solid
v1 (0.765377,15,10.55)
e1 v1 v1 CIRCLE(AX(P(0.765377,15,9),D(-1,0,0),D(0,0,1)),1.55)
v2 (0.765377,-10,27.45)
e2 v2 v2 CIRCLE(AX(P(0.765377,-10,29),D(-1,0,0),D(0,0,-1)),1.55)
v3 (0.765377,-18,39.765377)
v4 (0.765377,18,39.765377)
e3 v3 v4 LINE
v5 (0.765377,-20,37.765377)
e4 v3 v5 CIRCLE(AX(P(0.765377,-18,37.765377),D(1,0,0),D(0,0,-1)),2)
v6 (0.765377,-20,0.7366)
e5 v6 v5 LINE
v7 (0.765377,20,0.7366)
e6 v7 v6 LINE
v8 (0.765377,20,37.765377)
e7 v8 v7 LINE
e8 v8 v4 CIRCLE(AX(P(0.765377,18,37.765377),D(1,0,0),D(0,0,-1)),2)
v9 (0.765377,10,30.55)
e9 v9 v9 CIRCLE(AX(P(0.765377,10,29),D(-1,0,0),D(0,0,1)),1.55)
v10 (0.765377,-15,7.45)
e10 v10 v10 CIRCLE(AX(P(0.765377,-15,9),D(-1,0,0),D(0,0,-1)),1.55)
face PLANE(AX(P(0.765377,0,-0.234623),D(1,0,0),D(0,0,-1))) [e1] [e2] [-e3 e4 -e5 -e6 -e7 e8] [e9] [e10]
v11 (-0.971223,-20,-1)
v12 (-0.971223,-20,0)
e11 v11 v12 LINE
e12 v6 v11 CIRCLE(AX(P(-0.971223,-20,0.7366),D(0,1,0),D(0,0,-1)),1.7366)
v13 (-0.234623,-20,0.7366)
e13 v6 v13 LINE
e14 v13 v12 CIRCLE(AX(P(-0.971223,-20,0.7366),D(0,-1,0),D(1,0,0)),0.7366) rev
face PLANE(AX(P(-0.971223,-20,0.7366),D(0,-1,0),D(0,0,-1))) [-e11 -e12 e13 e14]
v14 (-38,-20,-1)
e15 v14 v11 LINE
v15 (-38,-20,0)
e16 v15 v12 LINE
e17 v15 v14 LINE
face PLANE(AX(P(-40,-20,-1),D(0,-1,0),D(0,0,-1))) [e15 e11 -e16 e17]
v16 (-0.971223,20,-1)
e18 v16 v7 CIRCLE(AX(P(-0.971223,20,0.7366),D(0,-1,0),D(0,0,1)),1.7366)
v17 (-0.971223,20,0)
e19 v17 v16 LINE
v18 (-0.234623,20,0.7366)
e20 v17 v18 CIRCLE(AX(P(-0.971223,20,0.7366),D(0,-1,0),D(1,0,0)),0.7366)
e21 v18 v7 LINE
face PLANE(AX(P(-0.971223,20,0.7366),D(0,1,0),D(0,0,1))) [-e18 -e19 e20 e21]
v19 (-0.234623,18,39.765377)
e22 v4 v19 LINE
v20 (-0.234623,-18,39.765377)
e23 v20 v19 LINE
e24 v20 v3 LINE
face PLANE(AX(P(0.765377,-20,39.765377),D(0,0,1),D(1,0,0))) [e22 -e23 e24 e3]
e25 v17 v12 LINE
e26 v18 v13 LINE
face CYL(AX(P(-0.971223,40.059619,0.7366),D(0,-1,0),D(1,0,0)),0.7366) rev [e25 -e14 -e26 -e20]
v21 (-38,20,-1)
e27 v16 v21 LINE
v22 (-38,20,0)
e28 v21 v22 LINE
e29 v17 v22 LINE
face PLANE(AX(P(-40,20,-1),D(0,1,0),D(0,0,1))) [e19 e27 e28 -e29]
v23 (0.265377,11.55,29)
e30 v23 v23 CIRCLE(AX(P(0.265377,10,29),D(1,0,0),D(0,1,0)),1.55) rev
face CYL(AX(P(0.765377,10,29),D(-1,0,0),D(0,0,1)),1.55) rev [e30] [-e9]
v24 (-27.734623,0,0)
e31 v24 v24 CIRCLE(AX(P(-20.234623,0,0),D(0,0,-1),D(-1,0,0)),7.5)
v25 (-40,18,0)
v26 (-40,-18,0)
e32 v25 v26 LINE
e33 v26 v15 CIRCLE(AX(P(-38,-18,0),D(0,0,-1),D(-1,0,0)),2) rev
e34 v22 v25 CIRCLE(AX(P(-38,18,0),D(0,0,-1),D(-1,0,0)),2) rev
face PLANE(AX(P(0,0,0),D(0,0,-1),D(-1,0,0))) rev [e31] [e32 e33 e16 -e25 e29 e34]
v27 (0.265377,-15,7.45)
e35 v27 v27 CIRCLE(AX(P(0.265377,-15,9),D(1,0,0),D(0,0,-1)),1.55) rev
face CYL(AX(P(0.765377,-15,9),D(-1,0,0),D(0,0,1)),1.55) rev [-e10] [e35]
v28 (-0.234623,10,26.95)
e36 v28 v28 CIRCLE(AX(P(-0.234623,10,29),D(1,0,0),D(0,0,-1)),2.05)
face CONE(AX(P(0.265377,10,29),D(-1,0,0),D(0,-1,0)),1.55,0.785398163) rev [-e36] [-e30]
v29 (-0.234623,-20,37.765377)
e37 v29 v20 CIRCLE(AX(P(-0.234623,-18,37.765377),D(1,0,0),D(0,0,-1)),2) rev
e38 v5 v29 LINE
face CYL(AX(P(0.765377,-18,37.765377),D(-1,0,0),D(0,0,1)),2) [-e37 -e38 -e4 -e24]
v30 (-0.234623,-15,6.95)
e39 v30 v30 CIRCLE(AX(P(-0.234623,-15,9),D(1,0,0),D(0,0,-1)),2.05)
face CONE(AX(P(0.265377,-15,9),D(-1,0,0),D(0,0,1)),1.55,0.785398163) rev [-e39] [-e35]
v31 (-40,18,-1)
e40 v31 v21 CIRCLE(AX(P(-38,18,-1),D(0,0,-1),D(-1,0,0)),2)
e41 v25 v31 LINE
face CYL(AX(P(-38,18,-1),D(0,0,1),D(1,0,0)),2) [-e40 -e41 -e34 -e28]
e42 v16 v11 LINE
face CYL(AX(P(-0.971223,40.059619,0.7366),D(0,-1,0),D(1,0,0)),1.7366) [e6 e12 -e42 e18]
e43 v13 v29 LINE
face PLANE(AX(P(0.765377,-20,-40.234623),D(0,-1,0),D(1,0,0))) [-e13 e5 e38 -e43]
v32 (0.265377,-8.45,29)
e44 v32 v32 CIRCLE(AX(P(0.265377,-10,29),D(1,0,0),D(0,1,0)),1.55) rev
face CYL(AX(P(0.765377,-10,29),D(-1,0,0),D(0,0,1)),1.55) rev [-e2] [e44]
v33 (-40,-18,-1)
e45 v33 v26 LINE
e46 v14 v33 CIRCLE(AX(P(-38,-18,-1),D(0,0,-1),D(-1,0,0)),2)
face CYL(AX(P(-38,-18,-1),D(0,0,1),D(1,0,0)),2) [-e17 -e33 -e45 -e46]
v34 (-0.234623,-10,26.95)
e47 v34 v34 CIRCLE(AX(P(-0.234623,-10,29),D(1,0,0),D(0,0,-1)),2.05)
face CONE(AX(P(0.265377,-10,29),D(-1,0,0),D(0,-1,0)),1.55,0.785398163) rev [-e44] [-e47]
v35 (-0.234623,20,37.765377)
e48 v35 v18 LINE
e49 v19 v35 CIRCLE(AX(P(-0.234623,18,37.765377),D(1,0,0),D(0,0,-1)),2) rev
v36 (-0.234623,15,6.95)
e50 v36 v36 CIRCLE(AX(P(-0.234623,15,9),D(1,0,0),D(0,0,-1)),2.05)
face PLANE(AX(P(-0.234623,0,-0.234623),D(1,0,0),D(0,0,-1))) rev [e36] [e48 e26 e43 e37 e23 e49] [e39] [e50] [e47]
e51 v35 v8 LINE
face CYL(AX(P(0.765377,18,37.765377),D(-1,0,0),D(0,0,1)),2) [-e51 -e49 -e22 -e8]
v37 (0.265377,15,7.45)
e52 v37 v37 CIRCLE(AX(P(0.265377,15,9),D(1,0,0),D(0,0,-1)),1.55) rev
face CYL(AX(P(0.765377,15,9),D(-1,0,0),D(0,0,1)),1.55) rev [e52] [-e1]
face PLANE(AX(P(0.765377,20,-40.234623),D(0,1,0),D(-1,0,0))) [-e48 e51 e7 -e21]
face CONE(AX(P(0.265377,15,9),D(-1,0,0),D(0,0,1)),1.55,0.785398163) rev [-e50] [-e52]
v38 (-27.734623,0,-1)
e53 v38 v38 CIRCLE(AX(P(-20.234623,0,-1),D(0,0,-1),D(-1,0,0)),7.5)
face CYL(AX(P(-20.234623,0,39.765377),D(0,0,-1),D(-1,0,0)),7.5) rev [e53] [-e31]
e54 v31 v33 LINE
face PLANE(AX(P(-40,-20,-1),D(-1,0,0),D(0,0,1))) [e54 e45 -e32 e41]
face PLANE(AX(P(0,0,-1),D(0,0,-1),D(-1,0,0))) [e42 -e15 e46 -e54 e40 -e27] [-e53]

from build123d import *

# Parameters (mm, degrees)
SKETCH1_W               = 80
SKETCH1_H               = 40
BASE_FLANGE1_DEPTH      = 1
SKETCHED_START          = -20
SKETCHED_BEND1_DEPTH    = 40
SKETCHED_BEND1_2_DEPTH  = 40
FILLET1_R               = 2
SKETCH9_R               = 1.55
CUT_EXTRUDE1_DEPTH      = 60.687271317
CUT_EXTRUDE3_DEPTH      = 61.512940202
CUT_EXTRUDE3_DEPTH_BACK = 61.512940202
SKETCH10_R              = 7.5
CHAMFER1_SIZE           = 0.5


# Read off the part's stored shape, not the designer's step: Sketched Bend1
# Sheet-metal steps are written as plain solids
with BuildPart() as part:
    # Sketch1 → Base-Flange1 (new body)
    with BuildSketch(Plane.XY):
        Rectangle(SKETCH1_W, SKETCH1_H)
    extrude(amount=-BASE_FLANGE1_DEPTH)

    # Sketched Bend1 outline → Sketched Bend1 (cut)
    with BuildSketch(Plane(origin=(0, 0, 0), x_dir=(1, 0, 0), z_dir=(0, 1, 0)).offset(SKETCHED_START)):
        with BuildLine():
            ThreePointArc((-0.971223369, 1), (-0.039397205, 0.728828115), (0.601417721, 0))
            Line((0.601417721, 0), (40, 0))
            Line((40, 0), (40, 1))
            Line((40, 1), (-0.971223369, 1))
        make_face()
    extrude(amount=SKETCHED_BEND1_DEPTH, mode=Mode.SUBTRACT)

    # Sketched Bend1 2 outline → Sketched Bend1 2 (add)
    with BuildSketch(Plane(origin=(0, 0, 0), x_dir=(1, 0, 0), z_dir=(0, 1, 0)).offset(SKETCHED_START)):
        with BuildLine():
            Line((-0.234623369, -0.7366), (-0.234623369, -39.765376631))
            Line((-0.234623369, -39.765376631), (0.765376631, -39.765376631))
            Line((0.765376631, -39.765376631), (0.765376631, -0.7366))
            ThreePointArc((0.765376631, -0.7366), (0.723891388, -0.359286442), (0.601417721, 0))
            Line((0.601417721, 0), (-0.971223369, 0))
            ThreePointArc((-0.971223369, 0), (-0.450368514, -0.215745145), (-0.234623369, -0.7366))
        make_face()
    extrude(amount=SKETCHED_BEND1_2_DEPTH)

    # Fillet1
    fillet1_edges = [part.edges().sort_by_distance(p)[0] for p in [
        (-40, -20, -0.5),
        (-40, 20, -0.5),
        (0.265376631, -20, 39.765376631),
        (0.265376631, 20, 39.765376631),
    ]]
    fillet(fillet1_edges, radius=FILLET1_R)

    # Sketch9 → Cut-Extrude1 (cut, through all)
    with BuildSketch(Plane.ZY.offset(0.234623369)):
        with Locations((9, 15)):
            Circle(SKETCH9_R)
        with Locations((29, 10)):
            Circle(SKETCH9_R)
        with Locations(Location((29, -10, 0), (0, 0, 180))):
            Circle(SKETCH9_R)
        with Locations(Location((9, -15, 0), (0, 0, 180))):
            Circle(SKETCH9_R)
    extrude(amount=-CUT_EXTRUDE1_DEPTH, mode=Mode.SUBTRACT)

    # Sketch10 → Cut-Extrude3 (cut, two sides: drawn at the far end of the back side and taken through both)
    with BuildSketch(Plane(origin=(0, 0, -1), x_dir=(-1, 0, 0), z_dir=(0, 0, -1)).offset(-CUT_EXTRUDE3_DEPTH_BACK)):
        with Locations((20.234623369, 0)):
            Circle(SKETCH10_R)
    extrude(amount=CUT_EXTRUDE3_DEPTH + CUT_EXTRUDE3_DEPTH_BACK, mode=Mode.SUBTRACT)

    # Chamfer1
    chamfer1_edges = [part.edges().sort_by_distance(p)[0] for p in [
        (-0.234623369, 15, 7.45),
        (-0.234623369, 10, 27.45),
        (-0.234623369, -10, 30.55),
        (-0.234623369, -15, 10.55),
    ]]
    chamfer(chamfer1_edges, length=CHAMFER1_SIZE)


solid = part.part
